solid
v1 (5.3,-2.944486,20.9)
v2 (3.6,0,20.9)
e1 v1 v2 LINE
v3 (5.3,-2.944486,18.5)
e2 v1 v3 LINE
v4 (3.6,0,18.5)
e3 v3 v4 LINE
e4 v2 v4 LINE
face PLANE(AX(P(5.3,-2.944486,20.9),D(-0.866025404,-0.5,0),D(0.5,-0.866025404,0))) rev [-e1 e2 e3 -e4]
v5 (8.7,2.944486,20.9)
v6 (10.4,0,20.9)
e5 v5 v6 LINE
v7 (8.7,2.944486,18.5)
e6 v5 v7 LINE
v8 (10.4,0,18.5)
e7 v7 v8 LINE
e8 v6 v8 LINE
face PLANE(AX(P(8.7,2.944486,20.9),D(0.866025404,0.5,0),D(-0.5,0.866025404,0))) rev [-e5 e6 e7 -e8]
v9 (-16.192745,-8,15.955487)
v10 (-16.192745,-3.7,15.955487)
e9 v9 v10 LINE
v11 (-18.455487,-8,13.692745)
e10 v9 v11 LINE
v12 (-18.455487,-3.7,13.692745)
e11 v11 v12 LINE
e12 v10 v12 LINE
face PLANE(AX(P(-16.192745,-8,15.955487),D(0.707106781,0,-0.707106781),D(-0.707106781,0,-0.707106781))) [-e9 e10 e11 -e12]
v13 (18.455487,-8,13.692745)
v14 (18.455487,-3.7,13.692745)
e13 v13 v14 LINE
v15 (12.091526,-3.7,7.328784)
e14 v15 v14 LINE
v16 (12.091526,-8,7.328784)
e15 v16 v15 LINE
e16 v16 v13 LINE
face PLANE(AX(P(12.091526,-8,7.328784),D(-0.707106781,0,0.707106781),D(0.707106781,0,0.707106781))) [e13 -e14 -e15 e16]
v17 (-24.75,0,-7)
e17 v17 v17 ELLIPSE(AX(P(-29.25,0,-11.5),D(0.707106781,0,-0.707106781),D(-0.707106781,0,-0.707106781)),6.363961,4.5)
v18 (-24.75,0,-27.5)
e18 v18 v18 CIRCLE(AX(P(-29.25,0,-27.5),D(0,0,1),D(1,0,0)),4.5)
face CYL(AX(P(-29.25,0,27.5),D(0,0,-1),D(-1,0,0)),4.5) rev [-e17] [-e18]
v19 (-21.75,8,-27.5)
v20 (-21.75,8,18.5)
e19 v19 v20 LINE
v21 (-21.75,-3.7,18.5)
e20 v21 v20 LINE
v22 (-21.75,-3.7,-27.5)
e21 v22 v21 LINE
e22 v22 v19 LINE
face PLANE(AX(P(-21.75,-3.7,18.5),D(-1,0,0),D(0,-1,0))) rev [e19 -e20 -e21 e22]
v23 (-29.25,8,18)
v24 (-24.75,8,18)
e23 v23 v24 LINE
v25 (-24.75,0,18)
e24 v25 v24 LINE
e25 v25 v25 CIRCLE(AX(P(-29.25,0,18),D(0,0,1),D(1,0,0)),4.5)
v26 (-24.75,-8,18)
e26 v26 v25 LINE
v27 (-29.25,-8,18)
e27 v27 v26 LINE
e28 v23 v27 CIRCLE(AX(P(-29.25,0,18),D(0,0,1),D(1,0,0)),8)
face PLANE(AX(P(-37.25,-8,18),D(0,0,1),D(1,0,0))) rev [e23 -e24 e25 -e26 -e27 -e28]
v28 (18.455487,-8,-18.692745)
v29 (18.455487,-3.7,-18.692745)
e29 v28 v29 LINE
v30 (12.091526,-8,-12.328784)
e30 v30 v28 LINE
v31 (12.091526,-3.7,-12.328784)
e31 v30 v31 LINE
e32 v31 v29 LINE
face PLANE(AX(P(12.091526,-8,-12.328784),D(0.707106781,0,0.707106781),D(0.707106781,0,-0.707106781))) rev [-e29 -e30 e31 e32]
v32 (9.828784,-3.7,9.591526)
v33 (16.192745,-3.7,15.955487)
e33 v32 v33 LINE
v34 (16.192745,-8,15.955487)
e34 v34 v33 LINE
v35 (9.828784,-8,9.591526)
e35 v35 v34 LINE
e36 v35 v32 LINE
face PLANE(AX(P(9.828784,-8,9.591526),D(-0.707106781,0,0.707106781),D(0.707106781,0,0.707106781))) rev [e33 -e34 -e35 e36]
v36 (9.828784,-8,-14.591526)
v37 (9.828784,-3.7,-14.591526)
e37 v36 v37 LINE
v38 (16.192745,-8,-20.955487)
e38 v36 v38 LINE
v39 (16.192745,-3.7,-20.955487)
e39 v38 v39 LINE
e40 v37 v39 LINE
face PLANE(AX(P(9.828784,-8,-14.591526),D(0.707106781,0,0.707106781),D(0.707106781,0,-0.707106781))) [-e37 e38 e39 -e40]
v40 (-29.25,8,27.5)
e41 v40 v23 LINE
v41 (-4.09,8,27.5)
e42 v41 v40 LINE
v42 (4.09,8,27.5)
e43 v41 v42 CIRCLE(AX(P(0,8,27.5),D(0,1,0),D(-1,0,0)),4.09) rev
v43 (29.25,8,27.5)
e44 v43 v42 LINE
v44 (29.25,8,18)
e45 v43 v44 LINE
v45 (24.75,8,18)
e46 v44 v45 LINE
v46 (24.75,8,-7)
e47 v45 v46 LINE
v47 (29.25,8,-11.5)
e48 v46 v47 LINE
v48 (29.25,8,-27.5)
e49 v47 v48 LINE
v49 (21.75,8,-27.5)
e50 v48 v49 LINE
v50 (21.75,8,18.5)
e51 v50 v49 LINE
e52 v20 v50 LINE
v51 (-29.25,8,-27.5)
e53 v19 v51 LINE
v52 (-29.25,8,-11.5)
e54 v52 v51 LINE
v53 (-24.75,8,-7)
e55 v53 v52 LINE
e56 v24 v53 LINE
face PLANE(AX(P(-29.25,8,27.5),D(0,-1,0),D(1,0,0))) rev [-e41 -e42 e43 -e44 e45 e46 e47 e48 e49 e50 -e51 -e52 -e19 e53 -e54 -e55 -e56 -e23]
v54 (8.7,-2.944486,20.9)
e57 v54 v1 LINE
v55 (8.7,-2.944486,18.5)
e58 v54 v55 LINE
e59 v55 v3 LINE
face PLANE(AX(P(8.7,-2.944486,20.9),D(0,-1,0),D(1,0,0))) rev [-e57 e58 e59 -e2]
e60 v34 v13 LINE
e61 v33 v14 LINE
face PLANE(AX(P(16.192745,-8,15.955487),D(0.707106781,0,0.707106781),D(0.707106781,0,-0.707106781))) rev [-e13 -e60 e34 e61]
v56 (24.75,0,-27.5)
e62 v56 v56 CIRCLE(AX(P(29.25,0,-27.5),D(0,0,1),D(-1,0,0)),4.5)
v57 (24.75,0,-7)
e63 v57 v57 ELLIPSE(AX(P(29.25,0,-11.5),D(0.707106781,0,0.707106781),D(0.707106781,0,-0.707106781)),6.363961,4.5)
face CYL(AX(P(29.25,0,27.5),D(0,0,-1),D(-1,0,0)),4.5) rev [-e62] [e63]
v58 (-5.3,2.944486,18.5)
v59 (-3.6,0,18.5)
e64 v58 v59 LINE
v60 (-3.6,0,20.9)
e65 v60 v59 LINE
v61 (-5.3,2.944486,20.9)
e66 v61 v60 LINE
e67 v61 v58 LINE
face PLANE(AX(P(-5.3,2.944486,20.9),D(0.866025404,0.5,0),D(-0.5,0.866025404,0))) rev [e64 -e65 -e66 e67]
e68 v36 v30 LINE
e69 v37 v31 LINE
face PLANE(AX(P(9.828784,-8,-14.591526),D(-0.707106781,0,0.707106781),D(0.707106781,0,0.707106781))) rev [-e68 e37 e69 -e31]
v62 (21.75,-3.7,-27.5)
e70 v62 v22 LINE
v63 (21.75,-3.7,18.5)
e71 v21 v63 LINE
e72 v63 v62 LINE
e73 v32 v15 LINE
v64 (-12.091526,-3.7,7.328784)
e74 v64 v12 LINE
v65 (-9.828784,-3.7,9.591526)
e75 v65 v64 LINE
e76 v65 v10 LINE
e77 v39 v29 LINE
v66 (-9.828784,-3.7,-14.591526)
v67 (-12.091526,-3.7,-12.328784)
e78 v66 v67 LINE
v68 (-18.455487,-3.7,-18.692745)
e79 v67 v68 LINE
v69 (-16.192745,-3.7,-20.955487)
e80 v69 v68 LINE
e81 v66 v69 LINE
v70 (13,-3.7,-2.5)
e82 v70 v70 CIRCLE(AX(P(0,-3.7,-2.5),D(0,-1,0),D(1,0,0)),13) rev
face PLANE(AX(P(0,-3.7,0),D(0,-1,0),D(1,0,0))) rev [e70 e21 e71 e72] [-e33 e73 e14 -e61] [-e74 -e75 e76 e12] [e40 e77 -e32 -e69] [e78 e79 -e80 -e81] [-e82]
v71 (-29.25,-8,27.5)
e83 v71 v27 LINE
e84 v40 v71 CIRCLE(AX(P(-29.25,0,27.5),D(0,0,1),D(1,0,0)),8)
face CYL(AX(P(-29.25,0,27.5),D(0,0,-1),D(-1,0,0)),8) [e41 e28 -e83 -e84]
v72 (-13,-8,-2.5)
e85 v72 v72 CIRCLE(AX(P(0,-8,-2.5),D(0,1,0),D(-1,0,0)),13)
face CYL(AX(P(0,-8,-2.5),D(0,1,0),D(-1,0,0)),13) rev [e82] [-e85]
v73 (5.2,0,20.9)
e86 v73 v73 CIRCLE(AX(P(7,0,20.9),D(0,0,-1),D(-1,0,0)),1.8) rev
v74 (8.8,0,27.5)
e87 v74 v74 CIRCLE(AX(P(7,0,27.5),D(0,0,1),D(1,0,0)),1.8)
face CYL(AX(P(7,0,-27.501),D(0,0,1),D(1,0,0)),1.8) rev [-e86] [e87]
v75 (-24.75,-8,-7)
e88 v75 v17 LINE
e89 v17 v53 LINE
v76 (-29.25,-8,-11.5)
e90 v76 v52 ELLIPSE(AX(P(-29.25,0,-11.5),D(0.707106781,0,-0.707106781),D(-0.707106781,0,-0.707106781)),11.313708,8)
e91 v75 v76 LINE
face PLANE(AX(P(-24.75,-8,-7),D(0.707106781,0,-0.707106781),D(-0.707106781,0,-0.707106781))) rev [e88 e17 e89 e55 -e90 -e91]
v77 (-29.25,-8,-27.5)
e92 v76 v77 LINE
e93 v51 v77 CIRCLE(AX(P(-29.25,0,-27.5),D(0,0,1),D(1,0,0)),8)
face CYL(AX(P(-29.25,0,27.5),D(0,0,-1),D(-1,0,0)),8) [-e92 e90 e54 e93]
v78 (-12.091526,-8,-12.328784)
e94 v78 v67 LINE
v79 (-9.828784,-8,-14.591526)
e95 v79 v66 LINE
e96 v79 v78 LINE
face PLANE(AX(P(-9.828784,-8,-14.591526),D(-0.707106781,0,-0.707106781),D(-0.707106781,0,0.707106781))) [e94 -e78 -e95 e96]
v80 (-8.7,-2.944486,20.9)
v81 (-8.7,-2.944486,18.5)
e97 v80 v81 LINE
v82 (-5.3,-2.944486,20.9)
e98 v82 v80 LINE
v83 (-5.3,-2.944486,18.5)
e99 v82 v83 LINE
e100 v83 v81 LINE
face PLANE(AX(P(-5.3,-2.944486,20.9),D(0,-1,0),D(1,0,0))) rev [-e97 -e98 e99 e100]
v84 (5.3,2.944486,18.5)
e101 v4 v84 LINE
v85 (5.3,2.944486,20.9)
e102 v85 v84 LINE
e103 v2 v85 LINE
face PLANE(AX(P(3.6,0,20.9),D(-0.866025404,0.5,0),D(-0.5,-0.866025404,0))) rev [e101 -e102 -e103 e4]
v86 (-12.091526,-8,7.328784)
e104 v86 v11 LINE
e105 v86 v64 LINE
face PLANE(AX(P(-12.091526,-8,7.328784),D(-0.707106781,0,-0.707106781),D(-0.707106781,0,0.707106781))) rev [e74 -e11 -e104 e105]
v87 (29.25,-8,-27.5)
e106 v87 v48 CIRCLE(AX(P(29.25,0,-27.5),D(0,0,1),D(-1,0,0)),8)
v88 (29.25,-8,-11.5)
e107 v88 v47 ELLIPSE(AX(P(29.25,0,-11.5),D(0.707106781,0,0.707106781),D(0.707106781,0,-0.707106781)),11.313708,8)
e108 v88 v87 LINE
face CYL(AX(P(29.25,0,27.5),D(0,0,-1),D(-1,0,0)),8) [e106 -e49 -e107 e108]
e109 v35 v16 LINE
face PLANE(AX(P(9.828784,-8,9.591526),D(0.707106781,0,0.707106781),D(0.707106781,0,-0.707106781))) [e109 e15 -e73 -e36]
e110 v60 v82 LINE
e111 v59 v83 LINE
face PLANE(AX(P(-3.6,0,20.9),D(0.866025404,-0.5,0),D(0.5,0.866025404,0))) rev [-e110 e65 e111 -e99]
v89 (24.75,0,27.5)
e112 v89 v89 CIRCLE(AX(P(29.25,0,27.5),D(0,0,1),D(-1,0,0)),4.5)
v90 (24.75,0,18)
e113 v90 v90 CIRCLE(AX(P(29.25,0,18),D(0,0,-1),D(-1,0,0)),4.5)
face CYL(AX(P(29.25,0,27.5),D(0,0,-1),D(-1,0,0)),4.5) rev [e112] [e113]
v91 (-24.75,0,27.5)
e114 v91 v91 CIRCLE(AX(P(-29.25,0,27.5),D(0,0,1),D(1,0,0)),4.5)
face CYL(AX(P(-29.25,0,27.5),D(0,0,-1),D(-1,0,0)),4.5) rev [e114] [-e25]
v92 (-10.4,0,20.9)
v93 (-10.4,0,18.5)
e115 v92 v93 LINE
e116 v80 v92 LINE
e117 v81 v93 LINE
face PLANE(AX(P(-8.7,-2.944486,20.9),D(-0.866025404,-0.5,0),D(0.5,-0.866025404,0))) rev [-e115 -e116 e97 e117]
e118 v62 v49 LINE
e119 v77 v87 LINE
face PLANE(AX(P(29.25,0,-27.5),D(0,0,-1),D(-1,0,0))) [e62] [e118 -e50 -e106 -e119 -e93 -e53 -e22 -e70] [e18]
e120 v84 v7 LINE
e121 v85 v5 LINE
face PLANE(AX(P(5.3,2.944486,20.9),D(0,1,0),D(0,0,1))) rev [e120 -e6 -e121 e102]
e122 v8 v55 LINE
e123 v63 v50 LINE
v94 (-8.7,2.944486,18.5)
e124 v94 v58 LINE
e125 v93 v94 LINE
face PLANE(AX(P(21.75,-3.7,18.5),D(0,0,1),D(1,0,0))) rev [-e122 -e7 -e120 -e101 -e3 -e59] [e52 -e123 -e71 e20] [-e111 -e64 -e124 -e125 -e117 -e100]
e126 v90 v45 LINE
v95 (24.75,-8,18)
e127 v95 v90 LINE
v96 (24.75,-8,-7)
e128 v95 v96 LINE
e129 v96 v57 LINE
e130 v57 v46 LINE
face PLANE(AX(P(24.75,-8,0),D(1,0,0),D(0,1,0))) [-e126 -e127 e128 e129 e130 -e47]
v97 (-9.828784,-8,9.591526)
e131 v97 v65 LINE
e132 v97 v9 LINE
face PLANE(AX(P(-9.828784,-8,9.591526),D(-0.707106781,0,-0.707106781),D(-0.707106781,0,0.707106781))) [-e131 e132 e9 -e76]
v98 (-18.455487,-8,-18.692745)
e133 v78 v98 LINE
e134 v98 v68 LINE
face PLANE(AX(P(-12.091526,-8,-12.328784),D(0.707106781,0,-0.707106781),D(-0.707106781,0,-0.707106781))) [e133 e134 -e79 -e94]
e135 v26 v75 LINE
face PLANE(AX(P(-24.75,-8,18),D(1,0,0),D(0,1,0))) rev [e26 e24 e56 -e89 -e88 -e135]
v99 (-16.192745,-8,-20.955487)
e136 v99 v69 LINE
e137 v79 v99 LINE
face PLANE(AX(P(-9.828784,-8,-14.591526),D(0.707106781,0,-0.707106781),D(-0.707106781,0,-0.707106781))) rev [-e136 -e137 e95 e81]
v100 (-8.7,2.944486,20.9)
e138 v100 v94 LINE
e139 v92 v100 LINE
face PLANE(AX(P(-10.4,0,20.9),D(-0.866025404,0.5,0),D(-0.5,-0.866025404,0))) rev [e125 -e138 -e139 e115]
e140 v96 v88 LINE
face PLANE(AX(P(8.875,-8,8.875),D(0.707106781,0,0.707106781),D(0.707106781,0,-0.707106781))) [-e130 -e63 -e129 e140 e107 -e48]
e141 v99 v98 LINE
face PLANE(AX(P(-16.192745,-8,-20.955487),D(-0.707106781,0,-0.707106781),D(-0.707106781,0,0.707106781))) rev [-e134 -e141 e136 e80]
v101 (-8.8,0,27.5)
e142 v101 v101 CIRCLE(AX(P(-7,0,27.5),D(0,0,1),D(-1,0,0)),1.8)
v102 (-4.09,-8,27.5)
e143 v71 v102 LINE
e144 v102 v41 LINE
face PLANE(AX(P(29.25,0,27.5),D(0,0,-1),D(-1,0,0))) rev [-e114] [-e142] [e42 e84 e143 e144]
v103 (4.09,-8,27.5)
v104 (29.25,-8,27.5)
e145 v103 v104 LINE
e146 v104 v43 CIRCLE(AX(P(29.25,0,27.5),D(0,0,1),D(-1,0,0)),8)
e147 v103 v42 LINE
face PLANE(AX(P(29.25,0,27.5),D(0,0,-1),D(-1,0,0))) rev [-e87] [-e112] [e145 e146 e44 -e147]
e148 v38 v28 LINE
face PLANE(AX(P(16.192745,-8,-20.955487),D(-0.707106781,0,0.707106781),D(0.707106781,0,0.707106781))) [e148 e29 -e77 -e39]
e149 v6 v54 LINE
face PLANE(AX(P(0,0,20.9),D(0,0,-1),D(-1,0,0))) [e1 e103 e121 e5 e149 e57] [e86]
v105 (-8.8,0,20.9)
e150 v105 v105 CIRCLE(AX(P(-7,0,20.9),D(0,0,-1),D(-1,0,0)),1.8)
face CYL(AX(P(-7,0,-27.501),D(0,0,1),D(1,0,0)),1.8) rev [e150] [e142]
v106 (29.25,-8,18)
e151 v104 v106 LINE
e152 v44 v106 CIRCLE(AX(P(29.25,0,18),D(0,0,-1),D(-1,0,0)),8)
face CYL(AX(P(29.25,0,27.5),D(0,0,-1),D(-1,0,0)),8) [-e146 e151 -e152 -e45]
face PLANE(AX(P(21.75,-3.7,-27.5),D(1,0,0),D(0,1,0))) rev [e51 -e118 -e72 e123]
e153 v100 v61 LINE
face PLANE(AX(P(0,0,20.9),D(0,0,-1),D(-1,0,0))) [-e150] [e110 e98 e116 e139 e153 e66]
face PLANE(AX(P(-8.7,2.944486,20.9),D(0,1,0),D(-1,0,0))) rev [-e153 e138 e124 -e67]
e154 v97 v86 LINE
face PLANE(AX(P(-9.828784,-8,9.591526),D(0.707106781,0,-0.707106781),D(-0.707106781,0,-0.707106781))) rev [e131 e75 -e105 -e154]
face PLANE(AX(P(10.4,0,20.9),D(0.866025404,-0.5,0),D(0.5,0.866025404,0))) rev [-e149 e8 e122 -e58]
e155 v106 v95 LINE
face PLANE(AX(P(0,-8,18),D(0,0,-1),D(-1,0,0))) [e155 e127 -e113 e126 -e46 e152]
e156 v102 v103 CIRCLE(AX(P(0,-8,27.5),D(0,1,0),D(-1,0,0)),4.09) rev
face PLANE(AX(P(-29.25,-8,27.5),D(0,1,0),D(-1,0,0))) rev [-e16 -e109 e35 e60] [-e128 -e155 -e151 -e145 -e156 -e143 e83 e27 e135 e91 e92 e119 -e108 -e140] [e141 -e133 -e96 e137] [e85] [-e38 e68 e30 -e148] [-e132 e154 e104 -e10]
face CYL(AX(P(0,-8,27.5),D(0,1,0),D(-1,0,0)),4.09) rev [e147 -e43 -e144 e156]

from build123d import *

# Parameters (mm, degrees)
SCHIZZO1_R        = 4.5
BASE_DEPTH        = 27.5
SCHIZZO3_R        = 13
HOLES_DEPTH       = 49.987881154
SCHIZZO5_W        = 43.5
SCHIZZO5_H        = 46
FLANGE_DEPTH      = 11.7
SCREW_HOLES_REACH = 68.907
SCHIZZO6_R        = 1.8
NUT_START         = -2.4
SCHIZZO7_R        = 1.8
NUT_HOLES_DEPTH   = 2.4


with BuildPart() as part:
    # Schizzo1 → Base (new, symmetric)
    with BuildSketch(Plane.XY):
        with BuildLine():
            Line((-29.25, -8), (29.25, -8))
            ThreePointArc((29.25, -8), (37.25, 0), (29.25, 8))
            Line((29.25, 8), (-29.25, 8))
            ThreePointArc((-29.25, 8), (-37.25, 0), (-29.25, -8))
        make_face()
        with Locations((-29.25, 0)):
            Circle(SCHIZZO1_R, mode=Mode.SUBTRACT)
        with Locations((29.25, 0)):
            Circle(SCHIZZO1_R, mode=Mode.SUBTRACT)
    extrude(amount=BASE_DEPTH, both=True)

    # Schizzo3 → Holes (cut, through all)
    with BuildSketch(Plane(origin=(0, 8, 0), x_dir=(1, 0, 0), z_dir=(0, 1, 0))):
        Polygon((9.828784258, 14.591525958), (12.091525958, 12.328784258), (18.455486989, 18.692745289), (16.192745289, 20.955486989), align=None)
        with BuildLine():
            Line((-4.09, -27.5), (4.09, -27.5))
            ThreePointArc((4.09, -27.5), (0, -23.41), (-4.09, -27.5))
        make_face()
        Polygon((37.25, -18), (37.25, 19.5), (24.75, 7), (24.75, -18), align=None)
        Polygon((-24.75, 7), (-37.25, 19.5), (-37.25, -18), (-24.75, -18), align=None)
        Polygon((-12.091525958, 12.328784258), (-9.828784258, 14.591525958), (-16.192745289, 20.955486989), (-18.455486989, 18.692745289), align=None)
        Polygon((12.091525958, -7.328784258), (9.828784258, -9.591525958), (16.192745289, -15.955486989), (18.455486989, -13.692745289), align=None)
        Polygon((-9.828784258, -9.591525958), (-12.091525958, -7.328784258), (-18.455486989, -13.692745289), (-16.192745289, -15.955486989), align=None)
        with Locations((0, 2.5)):
            Circle(SCHIZZO3_R)
    extrude(amount=-HOLES_DEPTH, mode=Mode.SUBTRACT)

    # Schizzo5 → Flange (cut)
    with BuildSketch(Plane(origin=(0, 8, 0), x_dir=(1, 0, 0), z_dir=(0, 1, 0))):
        with Locations((0, 4.5)):
            Rectangle(SCHIZZO5_W, SCHIZZO5_H)
    extrude(amount=-FLANGE_DEPTH, mode=Mode.SUBTRACT)

    # Schizzo6 → Screw holes (cut, up to next)
    with BuildSketch(Plane.XY.offset(27.5), mode=Mode.PRIVATE) as screw_holes_sk1:
        with Locations((7, 0)):
            Circle(SCHIZZO6_R)
    screw_holes_tool1 = extrude(screw_holes_sk1.sketch, amount=-SCREW_HOLES_REACH, mode=Mode.PRIVATE) & part.part
    # Schizzo6 → Screw holes (cut, up to next)
    with BuildSketch(Plane.XY.offset(27.5), mode=Mode.PRIVATE) as screw_holes_sk2:
        with Locations((-7, 0)):
            Circle(SCHIZZO6_R)
    screw_holes_tool2 = extrude(screw_holes_sk2.sketch, amount=-SCREW_HOLES_REACH, mode=Mode.PRIVATE) & part.part
    add(screw_holes_tool1.solids().sort_by_distance((7, 0, 27.5))[0], mode=Mode.SUBTRACT)
    add(screw_holes_tool2.solids().sort_by_distance((-7, 0, 27.5))[0], mode=Mode.SUBTRACT)

    # Schizzo7 → Nut holes (cut)
    # profile 1 of 2: a face of its own
    with BuildSketch(Plane(origin=(0, 0, 18.5), x_dir=(-1, 0, 0), z_dir=(0, 0, -1)).offset(NUT_START)):
        Polygon((-3.6, 0), (-5.3, 2.944486373), (-8.7, 2.944486373), (-10.4, 0), (-8.7, -2.944486373), (-5.3, -2.944486373), align=None)
    # profile 2 of 2: a face of its own
    with BuildSketch(Plane(origin=(0, 0, 18.5), x_dir=(-1, 0, 0), z_dir=(0, 0, -1)).offset(NUT_START)):
        Polygon((10.4, 0), (8.7, 2.944486373), (5.3, 2.944486373), (3.6, 0), (5.3, -2.944486373), (8.7, -2.944486373), align=None)
        with Locations((7, 0)):
            Circle(SCHIZZO7_R, mode=Mode.SUBTRACT)
    extrude(amount=NUT_HOLES_DEPTH, mode=Mode.SUBTRACT)


solid = part.part
